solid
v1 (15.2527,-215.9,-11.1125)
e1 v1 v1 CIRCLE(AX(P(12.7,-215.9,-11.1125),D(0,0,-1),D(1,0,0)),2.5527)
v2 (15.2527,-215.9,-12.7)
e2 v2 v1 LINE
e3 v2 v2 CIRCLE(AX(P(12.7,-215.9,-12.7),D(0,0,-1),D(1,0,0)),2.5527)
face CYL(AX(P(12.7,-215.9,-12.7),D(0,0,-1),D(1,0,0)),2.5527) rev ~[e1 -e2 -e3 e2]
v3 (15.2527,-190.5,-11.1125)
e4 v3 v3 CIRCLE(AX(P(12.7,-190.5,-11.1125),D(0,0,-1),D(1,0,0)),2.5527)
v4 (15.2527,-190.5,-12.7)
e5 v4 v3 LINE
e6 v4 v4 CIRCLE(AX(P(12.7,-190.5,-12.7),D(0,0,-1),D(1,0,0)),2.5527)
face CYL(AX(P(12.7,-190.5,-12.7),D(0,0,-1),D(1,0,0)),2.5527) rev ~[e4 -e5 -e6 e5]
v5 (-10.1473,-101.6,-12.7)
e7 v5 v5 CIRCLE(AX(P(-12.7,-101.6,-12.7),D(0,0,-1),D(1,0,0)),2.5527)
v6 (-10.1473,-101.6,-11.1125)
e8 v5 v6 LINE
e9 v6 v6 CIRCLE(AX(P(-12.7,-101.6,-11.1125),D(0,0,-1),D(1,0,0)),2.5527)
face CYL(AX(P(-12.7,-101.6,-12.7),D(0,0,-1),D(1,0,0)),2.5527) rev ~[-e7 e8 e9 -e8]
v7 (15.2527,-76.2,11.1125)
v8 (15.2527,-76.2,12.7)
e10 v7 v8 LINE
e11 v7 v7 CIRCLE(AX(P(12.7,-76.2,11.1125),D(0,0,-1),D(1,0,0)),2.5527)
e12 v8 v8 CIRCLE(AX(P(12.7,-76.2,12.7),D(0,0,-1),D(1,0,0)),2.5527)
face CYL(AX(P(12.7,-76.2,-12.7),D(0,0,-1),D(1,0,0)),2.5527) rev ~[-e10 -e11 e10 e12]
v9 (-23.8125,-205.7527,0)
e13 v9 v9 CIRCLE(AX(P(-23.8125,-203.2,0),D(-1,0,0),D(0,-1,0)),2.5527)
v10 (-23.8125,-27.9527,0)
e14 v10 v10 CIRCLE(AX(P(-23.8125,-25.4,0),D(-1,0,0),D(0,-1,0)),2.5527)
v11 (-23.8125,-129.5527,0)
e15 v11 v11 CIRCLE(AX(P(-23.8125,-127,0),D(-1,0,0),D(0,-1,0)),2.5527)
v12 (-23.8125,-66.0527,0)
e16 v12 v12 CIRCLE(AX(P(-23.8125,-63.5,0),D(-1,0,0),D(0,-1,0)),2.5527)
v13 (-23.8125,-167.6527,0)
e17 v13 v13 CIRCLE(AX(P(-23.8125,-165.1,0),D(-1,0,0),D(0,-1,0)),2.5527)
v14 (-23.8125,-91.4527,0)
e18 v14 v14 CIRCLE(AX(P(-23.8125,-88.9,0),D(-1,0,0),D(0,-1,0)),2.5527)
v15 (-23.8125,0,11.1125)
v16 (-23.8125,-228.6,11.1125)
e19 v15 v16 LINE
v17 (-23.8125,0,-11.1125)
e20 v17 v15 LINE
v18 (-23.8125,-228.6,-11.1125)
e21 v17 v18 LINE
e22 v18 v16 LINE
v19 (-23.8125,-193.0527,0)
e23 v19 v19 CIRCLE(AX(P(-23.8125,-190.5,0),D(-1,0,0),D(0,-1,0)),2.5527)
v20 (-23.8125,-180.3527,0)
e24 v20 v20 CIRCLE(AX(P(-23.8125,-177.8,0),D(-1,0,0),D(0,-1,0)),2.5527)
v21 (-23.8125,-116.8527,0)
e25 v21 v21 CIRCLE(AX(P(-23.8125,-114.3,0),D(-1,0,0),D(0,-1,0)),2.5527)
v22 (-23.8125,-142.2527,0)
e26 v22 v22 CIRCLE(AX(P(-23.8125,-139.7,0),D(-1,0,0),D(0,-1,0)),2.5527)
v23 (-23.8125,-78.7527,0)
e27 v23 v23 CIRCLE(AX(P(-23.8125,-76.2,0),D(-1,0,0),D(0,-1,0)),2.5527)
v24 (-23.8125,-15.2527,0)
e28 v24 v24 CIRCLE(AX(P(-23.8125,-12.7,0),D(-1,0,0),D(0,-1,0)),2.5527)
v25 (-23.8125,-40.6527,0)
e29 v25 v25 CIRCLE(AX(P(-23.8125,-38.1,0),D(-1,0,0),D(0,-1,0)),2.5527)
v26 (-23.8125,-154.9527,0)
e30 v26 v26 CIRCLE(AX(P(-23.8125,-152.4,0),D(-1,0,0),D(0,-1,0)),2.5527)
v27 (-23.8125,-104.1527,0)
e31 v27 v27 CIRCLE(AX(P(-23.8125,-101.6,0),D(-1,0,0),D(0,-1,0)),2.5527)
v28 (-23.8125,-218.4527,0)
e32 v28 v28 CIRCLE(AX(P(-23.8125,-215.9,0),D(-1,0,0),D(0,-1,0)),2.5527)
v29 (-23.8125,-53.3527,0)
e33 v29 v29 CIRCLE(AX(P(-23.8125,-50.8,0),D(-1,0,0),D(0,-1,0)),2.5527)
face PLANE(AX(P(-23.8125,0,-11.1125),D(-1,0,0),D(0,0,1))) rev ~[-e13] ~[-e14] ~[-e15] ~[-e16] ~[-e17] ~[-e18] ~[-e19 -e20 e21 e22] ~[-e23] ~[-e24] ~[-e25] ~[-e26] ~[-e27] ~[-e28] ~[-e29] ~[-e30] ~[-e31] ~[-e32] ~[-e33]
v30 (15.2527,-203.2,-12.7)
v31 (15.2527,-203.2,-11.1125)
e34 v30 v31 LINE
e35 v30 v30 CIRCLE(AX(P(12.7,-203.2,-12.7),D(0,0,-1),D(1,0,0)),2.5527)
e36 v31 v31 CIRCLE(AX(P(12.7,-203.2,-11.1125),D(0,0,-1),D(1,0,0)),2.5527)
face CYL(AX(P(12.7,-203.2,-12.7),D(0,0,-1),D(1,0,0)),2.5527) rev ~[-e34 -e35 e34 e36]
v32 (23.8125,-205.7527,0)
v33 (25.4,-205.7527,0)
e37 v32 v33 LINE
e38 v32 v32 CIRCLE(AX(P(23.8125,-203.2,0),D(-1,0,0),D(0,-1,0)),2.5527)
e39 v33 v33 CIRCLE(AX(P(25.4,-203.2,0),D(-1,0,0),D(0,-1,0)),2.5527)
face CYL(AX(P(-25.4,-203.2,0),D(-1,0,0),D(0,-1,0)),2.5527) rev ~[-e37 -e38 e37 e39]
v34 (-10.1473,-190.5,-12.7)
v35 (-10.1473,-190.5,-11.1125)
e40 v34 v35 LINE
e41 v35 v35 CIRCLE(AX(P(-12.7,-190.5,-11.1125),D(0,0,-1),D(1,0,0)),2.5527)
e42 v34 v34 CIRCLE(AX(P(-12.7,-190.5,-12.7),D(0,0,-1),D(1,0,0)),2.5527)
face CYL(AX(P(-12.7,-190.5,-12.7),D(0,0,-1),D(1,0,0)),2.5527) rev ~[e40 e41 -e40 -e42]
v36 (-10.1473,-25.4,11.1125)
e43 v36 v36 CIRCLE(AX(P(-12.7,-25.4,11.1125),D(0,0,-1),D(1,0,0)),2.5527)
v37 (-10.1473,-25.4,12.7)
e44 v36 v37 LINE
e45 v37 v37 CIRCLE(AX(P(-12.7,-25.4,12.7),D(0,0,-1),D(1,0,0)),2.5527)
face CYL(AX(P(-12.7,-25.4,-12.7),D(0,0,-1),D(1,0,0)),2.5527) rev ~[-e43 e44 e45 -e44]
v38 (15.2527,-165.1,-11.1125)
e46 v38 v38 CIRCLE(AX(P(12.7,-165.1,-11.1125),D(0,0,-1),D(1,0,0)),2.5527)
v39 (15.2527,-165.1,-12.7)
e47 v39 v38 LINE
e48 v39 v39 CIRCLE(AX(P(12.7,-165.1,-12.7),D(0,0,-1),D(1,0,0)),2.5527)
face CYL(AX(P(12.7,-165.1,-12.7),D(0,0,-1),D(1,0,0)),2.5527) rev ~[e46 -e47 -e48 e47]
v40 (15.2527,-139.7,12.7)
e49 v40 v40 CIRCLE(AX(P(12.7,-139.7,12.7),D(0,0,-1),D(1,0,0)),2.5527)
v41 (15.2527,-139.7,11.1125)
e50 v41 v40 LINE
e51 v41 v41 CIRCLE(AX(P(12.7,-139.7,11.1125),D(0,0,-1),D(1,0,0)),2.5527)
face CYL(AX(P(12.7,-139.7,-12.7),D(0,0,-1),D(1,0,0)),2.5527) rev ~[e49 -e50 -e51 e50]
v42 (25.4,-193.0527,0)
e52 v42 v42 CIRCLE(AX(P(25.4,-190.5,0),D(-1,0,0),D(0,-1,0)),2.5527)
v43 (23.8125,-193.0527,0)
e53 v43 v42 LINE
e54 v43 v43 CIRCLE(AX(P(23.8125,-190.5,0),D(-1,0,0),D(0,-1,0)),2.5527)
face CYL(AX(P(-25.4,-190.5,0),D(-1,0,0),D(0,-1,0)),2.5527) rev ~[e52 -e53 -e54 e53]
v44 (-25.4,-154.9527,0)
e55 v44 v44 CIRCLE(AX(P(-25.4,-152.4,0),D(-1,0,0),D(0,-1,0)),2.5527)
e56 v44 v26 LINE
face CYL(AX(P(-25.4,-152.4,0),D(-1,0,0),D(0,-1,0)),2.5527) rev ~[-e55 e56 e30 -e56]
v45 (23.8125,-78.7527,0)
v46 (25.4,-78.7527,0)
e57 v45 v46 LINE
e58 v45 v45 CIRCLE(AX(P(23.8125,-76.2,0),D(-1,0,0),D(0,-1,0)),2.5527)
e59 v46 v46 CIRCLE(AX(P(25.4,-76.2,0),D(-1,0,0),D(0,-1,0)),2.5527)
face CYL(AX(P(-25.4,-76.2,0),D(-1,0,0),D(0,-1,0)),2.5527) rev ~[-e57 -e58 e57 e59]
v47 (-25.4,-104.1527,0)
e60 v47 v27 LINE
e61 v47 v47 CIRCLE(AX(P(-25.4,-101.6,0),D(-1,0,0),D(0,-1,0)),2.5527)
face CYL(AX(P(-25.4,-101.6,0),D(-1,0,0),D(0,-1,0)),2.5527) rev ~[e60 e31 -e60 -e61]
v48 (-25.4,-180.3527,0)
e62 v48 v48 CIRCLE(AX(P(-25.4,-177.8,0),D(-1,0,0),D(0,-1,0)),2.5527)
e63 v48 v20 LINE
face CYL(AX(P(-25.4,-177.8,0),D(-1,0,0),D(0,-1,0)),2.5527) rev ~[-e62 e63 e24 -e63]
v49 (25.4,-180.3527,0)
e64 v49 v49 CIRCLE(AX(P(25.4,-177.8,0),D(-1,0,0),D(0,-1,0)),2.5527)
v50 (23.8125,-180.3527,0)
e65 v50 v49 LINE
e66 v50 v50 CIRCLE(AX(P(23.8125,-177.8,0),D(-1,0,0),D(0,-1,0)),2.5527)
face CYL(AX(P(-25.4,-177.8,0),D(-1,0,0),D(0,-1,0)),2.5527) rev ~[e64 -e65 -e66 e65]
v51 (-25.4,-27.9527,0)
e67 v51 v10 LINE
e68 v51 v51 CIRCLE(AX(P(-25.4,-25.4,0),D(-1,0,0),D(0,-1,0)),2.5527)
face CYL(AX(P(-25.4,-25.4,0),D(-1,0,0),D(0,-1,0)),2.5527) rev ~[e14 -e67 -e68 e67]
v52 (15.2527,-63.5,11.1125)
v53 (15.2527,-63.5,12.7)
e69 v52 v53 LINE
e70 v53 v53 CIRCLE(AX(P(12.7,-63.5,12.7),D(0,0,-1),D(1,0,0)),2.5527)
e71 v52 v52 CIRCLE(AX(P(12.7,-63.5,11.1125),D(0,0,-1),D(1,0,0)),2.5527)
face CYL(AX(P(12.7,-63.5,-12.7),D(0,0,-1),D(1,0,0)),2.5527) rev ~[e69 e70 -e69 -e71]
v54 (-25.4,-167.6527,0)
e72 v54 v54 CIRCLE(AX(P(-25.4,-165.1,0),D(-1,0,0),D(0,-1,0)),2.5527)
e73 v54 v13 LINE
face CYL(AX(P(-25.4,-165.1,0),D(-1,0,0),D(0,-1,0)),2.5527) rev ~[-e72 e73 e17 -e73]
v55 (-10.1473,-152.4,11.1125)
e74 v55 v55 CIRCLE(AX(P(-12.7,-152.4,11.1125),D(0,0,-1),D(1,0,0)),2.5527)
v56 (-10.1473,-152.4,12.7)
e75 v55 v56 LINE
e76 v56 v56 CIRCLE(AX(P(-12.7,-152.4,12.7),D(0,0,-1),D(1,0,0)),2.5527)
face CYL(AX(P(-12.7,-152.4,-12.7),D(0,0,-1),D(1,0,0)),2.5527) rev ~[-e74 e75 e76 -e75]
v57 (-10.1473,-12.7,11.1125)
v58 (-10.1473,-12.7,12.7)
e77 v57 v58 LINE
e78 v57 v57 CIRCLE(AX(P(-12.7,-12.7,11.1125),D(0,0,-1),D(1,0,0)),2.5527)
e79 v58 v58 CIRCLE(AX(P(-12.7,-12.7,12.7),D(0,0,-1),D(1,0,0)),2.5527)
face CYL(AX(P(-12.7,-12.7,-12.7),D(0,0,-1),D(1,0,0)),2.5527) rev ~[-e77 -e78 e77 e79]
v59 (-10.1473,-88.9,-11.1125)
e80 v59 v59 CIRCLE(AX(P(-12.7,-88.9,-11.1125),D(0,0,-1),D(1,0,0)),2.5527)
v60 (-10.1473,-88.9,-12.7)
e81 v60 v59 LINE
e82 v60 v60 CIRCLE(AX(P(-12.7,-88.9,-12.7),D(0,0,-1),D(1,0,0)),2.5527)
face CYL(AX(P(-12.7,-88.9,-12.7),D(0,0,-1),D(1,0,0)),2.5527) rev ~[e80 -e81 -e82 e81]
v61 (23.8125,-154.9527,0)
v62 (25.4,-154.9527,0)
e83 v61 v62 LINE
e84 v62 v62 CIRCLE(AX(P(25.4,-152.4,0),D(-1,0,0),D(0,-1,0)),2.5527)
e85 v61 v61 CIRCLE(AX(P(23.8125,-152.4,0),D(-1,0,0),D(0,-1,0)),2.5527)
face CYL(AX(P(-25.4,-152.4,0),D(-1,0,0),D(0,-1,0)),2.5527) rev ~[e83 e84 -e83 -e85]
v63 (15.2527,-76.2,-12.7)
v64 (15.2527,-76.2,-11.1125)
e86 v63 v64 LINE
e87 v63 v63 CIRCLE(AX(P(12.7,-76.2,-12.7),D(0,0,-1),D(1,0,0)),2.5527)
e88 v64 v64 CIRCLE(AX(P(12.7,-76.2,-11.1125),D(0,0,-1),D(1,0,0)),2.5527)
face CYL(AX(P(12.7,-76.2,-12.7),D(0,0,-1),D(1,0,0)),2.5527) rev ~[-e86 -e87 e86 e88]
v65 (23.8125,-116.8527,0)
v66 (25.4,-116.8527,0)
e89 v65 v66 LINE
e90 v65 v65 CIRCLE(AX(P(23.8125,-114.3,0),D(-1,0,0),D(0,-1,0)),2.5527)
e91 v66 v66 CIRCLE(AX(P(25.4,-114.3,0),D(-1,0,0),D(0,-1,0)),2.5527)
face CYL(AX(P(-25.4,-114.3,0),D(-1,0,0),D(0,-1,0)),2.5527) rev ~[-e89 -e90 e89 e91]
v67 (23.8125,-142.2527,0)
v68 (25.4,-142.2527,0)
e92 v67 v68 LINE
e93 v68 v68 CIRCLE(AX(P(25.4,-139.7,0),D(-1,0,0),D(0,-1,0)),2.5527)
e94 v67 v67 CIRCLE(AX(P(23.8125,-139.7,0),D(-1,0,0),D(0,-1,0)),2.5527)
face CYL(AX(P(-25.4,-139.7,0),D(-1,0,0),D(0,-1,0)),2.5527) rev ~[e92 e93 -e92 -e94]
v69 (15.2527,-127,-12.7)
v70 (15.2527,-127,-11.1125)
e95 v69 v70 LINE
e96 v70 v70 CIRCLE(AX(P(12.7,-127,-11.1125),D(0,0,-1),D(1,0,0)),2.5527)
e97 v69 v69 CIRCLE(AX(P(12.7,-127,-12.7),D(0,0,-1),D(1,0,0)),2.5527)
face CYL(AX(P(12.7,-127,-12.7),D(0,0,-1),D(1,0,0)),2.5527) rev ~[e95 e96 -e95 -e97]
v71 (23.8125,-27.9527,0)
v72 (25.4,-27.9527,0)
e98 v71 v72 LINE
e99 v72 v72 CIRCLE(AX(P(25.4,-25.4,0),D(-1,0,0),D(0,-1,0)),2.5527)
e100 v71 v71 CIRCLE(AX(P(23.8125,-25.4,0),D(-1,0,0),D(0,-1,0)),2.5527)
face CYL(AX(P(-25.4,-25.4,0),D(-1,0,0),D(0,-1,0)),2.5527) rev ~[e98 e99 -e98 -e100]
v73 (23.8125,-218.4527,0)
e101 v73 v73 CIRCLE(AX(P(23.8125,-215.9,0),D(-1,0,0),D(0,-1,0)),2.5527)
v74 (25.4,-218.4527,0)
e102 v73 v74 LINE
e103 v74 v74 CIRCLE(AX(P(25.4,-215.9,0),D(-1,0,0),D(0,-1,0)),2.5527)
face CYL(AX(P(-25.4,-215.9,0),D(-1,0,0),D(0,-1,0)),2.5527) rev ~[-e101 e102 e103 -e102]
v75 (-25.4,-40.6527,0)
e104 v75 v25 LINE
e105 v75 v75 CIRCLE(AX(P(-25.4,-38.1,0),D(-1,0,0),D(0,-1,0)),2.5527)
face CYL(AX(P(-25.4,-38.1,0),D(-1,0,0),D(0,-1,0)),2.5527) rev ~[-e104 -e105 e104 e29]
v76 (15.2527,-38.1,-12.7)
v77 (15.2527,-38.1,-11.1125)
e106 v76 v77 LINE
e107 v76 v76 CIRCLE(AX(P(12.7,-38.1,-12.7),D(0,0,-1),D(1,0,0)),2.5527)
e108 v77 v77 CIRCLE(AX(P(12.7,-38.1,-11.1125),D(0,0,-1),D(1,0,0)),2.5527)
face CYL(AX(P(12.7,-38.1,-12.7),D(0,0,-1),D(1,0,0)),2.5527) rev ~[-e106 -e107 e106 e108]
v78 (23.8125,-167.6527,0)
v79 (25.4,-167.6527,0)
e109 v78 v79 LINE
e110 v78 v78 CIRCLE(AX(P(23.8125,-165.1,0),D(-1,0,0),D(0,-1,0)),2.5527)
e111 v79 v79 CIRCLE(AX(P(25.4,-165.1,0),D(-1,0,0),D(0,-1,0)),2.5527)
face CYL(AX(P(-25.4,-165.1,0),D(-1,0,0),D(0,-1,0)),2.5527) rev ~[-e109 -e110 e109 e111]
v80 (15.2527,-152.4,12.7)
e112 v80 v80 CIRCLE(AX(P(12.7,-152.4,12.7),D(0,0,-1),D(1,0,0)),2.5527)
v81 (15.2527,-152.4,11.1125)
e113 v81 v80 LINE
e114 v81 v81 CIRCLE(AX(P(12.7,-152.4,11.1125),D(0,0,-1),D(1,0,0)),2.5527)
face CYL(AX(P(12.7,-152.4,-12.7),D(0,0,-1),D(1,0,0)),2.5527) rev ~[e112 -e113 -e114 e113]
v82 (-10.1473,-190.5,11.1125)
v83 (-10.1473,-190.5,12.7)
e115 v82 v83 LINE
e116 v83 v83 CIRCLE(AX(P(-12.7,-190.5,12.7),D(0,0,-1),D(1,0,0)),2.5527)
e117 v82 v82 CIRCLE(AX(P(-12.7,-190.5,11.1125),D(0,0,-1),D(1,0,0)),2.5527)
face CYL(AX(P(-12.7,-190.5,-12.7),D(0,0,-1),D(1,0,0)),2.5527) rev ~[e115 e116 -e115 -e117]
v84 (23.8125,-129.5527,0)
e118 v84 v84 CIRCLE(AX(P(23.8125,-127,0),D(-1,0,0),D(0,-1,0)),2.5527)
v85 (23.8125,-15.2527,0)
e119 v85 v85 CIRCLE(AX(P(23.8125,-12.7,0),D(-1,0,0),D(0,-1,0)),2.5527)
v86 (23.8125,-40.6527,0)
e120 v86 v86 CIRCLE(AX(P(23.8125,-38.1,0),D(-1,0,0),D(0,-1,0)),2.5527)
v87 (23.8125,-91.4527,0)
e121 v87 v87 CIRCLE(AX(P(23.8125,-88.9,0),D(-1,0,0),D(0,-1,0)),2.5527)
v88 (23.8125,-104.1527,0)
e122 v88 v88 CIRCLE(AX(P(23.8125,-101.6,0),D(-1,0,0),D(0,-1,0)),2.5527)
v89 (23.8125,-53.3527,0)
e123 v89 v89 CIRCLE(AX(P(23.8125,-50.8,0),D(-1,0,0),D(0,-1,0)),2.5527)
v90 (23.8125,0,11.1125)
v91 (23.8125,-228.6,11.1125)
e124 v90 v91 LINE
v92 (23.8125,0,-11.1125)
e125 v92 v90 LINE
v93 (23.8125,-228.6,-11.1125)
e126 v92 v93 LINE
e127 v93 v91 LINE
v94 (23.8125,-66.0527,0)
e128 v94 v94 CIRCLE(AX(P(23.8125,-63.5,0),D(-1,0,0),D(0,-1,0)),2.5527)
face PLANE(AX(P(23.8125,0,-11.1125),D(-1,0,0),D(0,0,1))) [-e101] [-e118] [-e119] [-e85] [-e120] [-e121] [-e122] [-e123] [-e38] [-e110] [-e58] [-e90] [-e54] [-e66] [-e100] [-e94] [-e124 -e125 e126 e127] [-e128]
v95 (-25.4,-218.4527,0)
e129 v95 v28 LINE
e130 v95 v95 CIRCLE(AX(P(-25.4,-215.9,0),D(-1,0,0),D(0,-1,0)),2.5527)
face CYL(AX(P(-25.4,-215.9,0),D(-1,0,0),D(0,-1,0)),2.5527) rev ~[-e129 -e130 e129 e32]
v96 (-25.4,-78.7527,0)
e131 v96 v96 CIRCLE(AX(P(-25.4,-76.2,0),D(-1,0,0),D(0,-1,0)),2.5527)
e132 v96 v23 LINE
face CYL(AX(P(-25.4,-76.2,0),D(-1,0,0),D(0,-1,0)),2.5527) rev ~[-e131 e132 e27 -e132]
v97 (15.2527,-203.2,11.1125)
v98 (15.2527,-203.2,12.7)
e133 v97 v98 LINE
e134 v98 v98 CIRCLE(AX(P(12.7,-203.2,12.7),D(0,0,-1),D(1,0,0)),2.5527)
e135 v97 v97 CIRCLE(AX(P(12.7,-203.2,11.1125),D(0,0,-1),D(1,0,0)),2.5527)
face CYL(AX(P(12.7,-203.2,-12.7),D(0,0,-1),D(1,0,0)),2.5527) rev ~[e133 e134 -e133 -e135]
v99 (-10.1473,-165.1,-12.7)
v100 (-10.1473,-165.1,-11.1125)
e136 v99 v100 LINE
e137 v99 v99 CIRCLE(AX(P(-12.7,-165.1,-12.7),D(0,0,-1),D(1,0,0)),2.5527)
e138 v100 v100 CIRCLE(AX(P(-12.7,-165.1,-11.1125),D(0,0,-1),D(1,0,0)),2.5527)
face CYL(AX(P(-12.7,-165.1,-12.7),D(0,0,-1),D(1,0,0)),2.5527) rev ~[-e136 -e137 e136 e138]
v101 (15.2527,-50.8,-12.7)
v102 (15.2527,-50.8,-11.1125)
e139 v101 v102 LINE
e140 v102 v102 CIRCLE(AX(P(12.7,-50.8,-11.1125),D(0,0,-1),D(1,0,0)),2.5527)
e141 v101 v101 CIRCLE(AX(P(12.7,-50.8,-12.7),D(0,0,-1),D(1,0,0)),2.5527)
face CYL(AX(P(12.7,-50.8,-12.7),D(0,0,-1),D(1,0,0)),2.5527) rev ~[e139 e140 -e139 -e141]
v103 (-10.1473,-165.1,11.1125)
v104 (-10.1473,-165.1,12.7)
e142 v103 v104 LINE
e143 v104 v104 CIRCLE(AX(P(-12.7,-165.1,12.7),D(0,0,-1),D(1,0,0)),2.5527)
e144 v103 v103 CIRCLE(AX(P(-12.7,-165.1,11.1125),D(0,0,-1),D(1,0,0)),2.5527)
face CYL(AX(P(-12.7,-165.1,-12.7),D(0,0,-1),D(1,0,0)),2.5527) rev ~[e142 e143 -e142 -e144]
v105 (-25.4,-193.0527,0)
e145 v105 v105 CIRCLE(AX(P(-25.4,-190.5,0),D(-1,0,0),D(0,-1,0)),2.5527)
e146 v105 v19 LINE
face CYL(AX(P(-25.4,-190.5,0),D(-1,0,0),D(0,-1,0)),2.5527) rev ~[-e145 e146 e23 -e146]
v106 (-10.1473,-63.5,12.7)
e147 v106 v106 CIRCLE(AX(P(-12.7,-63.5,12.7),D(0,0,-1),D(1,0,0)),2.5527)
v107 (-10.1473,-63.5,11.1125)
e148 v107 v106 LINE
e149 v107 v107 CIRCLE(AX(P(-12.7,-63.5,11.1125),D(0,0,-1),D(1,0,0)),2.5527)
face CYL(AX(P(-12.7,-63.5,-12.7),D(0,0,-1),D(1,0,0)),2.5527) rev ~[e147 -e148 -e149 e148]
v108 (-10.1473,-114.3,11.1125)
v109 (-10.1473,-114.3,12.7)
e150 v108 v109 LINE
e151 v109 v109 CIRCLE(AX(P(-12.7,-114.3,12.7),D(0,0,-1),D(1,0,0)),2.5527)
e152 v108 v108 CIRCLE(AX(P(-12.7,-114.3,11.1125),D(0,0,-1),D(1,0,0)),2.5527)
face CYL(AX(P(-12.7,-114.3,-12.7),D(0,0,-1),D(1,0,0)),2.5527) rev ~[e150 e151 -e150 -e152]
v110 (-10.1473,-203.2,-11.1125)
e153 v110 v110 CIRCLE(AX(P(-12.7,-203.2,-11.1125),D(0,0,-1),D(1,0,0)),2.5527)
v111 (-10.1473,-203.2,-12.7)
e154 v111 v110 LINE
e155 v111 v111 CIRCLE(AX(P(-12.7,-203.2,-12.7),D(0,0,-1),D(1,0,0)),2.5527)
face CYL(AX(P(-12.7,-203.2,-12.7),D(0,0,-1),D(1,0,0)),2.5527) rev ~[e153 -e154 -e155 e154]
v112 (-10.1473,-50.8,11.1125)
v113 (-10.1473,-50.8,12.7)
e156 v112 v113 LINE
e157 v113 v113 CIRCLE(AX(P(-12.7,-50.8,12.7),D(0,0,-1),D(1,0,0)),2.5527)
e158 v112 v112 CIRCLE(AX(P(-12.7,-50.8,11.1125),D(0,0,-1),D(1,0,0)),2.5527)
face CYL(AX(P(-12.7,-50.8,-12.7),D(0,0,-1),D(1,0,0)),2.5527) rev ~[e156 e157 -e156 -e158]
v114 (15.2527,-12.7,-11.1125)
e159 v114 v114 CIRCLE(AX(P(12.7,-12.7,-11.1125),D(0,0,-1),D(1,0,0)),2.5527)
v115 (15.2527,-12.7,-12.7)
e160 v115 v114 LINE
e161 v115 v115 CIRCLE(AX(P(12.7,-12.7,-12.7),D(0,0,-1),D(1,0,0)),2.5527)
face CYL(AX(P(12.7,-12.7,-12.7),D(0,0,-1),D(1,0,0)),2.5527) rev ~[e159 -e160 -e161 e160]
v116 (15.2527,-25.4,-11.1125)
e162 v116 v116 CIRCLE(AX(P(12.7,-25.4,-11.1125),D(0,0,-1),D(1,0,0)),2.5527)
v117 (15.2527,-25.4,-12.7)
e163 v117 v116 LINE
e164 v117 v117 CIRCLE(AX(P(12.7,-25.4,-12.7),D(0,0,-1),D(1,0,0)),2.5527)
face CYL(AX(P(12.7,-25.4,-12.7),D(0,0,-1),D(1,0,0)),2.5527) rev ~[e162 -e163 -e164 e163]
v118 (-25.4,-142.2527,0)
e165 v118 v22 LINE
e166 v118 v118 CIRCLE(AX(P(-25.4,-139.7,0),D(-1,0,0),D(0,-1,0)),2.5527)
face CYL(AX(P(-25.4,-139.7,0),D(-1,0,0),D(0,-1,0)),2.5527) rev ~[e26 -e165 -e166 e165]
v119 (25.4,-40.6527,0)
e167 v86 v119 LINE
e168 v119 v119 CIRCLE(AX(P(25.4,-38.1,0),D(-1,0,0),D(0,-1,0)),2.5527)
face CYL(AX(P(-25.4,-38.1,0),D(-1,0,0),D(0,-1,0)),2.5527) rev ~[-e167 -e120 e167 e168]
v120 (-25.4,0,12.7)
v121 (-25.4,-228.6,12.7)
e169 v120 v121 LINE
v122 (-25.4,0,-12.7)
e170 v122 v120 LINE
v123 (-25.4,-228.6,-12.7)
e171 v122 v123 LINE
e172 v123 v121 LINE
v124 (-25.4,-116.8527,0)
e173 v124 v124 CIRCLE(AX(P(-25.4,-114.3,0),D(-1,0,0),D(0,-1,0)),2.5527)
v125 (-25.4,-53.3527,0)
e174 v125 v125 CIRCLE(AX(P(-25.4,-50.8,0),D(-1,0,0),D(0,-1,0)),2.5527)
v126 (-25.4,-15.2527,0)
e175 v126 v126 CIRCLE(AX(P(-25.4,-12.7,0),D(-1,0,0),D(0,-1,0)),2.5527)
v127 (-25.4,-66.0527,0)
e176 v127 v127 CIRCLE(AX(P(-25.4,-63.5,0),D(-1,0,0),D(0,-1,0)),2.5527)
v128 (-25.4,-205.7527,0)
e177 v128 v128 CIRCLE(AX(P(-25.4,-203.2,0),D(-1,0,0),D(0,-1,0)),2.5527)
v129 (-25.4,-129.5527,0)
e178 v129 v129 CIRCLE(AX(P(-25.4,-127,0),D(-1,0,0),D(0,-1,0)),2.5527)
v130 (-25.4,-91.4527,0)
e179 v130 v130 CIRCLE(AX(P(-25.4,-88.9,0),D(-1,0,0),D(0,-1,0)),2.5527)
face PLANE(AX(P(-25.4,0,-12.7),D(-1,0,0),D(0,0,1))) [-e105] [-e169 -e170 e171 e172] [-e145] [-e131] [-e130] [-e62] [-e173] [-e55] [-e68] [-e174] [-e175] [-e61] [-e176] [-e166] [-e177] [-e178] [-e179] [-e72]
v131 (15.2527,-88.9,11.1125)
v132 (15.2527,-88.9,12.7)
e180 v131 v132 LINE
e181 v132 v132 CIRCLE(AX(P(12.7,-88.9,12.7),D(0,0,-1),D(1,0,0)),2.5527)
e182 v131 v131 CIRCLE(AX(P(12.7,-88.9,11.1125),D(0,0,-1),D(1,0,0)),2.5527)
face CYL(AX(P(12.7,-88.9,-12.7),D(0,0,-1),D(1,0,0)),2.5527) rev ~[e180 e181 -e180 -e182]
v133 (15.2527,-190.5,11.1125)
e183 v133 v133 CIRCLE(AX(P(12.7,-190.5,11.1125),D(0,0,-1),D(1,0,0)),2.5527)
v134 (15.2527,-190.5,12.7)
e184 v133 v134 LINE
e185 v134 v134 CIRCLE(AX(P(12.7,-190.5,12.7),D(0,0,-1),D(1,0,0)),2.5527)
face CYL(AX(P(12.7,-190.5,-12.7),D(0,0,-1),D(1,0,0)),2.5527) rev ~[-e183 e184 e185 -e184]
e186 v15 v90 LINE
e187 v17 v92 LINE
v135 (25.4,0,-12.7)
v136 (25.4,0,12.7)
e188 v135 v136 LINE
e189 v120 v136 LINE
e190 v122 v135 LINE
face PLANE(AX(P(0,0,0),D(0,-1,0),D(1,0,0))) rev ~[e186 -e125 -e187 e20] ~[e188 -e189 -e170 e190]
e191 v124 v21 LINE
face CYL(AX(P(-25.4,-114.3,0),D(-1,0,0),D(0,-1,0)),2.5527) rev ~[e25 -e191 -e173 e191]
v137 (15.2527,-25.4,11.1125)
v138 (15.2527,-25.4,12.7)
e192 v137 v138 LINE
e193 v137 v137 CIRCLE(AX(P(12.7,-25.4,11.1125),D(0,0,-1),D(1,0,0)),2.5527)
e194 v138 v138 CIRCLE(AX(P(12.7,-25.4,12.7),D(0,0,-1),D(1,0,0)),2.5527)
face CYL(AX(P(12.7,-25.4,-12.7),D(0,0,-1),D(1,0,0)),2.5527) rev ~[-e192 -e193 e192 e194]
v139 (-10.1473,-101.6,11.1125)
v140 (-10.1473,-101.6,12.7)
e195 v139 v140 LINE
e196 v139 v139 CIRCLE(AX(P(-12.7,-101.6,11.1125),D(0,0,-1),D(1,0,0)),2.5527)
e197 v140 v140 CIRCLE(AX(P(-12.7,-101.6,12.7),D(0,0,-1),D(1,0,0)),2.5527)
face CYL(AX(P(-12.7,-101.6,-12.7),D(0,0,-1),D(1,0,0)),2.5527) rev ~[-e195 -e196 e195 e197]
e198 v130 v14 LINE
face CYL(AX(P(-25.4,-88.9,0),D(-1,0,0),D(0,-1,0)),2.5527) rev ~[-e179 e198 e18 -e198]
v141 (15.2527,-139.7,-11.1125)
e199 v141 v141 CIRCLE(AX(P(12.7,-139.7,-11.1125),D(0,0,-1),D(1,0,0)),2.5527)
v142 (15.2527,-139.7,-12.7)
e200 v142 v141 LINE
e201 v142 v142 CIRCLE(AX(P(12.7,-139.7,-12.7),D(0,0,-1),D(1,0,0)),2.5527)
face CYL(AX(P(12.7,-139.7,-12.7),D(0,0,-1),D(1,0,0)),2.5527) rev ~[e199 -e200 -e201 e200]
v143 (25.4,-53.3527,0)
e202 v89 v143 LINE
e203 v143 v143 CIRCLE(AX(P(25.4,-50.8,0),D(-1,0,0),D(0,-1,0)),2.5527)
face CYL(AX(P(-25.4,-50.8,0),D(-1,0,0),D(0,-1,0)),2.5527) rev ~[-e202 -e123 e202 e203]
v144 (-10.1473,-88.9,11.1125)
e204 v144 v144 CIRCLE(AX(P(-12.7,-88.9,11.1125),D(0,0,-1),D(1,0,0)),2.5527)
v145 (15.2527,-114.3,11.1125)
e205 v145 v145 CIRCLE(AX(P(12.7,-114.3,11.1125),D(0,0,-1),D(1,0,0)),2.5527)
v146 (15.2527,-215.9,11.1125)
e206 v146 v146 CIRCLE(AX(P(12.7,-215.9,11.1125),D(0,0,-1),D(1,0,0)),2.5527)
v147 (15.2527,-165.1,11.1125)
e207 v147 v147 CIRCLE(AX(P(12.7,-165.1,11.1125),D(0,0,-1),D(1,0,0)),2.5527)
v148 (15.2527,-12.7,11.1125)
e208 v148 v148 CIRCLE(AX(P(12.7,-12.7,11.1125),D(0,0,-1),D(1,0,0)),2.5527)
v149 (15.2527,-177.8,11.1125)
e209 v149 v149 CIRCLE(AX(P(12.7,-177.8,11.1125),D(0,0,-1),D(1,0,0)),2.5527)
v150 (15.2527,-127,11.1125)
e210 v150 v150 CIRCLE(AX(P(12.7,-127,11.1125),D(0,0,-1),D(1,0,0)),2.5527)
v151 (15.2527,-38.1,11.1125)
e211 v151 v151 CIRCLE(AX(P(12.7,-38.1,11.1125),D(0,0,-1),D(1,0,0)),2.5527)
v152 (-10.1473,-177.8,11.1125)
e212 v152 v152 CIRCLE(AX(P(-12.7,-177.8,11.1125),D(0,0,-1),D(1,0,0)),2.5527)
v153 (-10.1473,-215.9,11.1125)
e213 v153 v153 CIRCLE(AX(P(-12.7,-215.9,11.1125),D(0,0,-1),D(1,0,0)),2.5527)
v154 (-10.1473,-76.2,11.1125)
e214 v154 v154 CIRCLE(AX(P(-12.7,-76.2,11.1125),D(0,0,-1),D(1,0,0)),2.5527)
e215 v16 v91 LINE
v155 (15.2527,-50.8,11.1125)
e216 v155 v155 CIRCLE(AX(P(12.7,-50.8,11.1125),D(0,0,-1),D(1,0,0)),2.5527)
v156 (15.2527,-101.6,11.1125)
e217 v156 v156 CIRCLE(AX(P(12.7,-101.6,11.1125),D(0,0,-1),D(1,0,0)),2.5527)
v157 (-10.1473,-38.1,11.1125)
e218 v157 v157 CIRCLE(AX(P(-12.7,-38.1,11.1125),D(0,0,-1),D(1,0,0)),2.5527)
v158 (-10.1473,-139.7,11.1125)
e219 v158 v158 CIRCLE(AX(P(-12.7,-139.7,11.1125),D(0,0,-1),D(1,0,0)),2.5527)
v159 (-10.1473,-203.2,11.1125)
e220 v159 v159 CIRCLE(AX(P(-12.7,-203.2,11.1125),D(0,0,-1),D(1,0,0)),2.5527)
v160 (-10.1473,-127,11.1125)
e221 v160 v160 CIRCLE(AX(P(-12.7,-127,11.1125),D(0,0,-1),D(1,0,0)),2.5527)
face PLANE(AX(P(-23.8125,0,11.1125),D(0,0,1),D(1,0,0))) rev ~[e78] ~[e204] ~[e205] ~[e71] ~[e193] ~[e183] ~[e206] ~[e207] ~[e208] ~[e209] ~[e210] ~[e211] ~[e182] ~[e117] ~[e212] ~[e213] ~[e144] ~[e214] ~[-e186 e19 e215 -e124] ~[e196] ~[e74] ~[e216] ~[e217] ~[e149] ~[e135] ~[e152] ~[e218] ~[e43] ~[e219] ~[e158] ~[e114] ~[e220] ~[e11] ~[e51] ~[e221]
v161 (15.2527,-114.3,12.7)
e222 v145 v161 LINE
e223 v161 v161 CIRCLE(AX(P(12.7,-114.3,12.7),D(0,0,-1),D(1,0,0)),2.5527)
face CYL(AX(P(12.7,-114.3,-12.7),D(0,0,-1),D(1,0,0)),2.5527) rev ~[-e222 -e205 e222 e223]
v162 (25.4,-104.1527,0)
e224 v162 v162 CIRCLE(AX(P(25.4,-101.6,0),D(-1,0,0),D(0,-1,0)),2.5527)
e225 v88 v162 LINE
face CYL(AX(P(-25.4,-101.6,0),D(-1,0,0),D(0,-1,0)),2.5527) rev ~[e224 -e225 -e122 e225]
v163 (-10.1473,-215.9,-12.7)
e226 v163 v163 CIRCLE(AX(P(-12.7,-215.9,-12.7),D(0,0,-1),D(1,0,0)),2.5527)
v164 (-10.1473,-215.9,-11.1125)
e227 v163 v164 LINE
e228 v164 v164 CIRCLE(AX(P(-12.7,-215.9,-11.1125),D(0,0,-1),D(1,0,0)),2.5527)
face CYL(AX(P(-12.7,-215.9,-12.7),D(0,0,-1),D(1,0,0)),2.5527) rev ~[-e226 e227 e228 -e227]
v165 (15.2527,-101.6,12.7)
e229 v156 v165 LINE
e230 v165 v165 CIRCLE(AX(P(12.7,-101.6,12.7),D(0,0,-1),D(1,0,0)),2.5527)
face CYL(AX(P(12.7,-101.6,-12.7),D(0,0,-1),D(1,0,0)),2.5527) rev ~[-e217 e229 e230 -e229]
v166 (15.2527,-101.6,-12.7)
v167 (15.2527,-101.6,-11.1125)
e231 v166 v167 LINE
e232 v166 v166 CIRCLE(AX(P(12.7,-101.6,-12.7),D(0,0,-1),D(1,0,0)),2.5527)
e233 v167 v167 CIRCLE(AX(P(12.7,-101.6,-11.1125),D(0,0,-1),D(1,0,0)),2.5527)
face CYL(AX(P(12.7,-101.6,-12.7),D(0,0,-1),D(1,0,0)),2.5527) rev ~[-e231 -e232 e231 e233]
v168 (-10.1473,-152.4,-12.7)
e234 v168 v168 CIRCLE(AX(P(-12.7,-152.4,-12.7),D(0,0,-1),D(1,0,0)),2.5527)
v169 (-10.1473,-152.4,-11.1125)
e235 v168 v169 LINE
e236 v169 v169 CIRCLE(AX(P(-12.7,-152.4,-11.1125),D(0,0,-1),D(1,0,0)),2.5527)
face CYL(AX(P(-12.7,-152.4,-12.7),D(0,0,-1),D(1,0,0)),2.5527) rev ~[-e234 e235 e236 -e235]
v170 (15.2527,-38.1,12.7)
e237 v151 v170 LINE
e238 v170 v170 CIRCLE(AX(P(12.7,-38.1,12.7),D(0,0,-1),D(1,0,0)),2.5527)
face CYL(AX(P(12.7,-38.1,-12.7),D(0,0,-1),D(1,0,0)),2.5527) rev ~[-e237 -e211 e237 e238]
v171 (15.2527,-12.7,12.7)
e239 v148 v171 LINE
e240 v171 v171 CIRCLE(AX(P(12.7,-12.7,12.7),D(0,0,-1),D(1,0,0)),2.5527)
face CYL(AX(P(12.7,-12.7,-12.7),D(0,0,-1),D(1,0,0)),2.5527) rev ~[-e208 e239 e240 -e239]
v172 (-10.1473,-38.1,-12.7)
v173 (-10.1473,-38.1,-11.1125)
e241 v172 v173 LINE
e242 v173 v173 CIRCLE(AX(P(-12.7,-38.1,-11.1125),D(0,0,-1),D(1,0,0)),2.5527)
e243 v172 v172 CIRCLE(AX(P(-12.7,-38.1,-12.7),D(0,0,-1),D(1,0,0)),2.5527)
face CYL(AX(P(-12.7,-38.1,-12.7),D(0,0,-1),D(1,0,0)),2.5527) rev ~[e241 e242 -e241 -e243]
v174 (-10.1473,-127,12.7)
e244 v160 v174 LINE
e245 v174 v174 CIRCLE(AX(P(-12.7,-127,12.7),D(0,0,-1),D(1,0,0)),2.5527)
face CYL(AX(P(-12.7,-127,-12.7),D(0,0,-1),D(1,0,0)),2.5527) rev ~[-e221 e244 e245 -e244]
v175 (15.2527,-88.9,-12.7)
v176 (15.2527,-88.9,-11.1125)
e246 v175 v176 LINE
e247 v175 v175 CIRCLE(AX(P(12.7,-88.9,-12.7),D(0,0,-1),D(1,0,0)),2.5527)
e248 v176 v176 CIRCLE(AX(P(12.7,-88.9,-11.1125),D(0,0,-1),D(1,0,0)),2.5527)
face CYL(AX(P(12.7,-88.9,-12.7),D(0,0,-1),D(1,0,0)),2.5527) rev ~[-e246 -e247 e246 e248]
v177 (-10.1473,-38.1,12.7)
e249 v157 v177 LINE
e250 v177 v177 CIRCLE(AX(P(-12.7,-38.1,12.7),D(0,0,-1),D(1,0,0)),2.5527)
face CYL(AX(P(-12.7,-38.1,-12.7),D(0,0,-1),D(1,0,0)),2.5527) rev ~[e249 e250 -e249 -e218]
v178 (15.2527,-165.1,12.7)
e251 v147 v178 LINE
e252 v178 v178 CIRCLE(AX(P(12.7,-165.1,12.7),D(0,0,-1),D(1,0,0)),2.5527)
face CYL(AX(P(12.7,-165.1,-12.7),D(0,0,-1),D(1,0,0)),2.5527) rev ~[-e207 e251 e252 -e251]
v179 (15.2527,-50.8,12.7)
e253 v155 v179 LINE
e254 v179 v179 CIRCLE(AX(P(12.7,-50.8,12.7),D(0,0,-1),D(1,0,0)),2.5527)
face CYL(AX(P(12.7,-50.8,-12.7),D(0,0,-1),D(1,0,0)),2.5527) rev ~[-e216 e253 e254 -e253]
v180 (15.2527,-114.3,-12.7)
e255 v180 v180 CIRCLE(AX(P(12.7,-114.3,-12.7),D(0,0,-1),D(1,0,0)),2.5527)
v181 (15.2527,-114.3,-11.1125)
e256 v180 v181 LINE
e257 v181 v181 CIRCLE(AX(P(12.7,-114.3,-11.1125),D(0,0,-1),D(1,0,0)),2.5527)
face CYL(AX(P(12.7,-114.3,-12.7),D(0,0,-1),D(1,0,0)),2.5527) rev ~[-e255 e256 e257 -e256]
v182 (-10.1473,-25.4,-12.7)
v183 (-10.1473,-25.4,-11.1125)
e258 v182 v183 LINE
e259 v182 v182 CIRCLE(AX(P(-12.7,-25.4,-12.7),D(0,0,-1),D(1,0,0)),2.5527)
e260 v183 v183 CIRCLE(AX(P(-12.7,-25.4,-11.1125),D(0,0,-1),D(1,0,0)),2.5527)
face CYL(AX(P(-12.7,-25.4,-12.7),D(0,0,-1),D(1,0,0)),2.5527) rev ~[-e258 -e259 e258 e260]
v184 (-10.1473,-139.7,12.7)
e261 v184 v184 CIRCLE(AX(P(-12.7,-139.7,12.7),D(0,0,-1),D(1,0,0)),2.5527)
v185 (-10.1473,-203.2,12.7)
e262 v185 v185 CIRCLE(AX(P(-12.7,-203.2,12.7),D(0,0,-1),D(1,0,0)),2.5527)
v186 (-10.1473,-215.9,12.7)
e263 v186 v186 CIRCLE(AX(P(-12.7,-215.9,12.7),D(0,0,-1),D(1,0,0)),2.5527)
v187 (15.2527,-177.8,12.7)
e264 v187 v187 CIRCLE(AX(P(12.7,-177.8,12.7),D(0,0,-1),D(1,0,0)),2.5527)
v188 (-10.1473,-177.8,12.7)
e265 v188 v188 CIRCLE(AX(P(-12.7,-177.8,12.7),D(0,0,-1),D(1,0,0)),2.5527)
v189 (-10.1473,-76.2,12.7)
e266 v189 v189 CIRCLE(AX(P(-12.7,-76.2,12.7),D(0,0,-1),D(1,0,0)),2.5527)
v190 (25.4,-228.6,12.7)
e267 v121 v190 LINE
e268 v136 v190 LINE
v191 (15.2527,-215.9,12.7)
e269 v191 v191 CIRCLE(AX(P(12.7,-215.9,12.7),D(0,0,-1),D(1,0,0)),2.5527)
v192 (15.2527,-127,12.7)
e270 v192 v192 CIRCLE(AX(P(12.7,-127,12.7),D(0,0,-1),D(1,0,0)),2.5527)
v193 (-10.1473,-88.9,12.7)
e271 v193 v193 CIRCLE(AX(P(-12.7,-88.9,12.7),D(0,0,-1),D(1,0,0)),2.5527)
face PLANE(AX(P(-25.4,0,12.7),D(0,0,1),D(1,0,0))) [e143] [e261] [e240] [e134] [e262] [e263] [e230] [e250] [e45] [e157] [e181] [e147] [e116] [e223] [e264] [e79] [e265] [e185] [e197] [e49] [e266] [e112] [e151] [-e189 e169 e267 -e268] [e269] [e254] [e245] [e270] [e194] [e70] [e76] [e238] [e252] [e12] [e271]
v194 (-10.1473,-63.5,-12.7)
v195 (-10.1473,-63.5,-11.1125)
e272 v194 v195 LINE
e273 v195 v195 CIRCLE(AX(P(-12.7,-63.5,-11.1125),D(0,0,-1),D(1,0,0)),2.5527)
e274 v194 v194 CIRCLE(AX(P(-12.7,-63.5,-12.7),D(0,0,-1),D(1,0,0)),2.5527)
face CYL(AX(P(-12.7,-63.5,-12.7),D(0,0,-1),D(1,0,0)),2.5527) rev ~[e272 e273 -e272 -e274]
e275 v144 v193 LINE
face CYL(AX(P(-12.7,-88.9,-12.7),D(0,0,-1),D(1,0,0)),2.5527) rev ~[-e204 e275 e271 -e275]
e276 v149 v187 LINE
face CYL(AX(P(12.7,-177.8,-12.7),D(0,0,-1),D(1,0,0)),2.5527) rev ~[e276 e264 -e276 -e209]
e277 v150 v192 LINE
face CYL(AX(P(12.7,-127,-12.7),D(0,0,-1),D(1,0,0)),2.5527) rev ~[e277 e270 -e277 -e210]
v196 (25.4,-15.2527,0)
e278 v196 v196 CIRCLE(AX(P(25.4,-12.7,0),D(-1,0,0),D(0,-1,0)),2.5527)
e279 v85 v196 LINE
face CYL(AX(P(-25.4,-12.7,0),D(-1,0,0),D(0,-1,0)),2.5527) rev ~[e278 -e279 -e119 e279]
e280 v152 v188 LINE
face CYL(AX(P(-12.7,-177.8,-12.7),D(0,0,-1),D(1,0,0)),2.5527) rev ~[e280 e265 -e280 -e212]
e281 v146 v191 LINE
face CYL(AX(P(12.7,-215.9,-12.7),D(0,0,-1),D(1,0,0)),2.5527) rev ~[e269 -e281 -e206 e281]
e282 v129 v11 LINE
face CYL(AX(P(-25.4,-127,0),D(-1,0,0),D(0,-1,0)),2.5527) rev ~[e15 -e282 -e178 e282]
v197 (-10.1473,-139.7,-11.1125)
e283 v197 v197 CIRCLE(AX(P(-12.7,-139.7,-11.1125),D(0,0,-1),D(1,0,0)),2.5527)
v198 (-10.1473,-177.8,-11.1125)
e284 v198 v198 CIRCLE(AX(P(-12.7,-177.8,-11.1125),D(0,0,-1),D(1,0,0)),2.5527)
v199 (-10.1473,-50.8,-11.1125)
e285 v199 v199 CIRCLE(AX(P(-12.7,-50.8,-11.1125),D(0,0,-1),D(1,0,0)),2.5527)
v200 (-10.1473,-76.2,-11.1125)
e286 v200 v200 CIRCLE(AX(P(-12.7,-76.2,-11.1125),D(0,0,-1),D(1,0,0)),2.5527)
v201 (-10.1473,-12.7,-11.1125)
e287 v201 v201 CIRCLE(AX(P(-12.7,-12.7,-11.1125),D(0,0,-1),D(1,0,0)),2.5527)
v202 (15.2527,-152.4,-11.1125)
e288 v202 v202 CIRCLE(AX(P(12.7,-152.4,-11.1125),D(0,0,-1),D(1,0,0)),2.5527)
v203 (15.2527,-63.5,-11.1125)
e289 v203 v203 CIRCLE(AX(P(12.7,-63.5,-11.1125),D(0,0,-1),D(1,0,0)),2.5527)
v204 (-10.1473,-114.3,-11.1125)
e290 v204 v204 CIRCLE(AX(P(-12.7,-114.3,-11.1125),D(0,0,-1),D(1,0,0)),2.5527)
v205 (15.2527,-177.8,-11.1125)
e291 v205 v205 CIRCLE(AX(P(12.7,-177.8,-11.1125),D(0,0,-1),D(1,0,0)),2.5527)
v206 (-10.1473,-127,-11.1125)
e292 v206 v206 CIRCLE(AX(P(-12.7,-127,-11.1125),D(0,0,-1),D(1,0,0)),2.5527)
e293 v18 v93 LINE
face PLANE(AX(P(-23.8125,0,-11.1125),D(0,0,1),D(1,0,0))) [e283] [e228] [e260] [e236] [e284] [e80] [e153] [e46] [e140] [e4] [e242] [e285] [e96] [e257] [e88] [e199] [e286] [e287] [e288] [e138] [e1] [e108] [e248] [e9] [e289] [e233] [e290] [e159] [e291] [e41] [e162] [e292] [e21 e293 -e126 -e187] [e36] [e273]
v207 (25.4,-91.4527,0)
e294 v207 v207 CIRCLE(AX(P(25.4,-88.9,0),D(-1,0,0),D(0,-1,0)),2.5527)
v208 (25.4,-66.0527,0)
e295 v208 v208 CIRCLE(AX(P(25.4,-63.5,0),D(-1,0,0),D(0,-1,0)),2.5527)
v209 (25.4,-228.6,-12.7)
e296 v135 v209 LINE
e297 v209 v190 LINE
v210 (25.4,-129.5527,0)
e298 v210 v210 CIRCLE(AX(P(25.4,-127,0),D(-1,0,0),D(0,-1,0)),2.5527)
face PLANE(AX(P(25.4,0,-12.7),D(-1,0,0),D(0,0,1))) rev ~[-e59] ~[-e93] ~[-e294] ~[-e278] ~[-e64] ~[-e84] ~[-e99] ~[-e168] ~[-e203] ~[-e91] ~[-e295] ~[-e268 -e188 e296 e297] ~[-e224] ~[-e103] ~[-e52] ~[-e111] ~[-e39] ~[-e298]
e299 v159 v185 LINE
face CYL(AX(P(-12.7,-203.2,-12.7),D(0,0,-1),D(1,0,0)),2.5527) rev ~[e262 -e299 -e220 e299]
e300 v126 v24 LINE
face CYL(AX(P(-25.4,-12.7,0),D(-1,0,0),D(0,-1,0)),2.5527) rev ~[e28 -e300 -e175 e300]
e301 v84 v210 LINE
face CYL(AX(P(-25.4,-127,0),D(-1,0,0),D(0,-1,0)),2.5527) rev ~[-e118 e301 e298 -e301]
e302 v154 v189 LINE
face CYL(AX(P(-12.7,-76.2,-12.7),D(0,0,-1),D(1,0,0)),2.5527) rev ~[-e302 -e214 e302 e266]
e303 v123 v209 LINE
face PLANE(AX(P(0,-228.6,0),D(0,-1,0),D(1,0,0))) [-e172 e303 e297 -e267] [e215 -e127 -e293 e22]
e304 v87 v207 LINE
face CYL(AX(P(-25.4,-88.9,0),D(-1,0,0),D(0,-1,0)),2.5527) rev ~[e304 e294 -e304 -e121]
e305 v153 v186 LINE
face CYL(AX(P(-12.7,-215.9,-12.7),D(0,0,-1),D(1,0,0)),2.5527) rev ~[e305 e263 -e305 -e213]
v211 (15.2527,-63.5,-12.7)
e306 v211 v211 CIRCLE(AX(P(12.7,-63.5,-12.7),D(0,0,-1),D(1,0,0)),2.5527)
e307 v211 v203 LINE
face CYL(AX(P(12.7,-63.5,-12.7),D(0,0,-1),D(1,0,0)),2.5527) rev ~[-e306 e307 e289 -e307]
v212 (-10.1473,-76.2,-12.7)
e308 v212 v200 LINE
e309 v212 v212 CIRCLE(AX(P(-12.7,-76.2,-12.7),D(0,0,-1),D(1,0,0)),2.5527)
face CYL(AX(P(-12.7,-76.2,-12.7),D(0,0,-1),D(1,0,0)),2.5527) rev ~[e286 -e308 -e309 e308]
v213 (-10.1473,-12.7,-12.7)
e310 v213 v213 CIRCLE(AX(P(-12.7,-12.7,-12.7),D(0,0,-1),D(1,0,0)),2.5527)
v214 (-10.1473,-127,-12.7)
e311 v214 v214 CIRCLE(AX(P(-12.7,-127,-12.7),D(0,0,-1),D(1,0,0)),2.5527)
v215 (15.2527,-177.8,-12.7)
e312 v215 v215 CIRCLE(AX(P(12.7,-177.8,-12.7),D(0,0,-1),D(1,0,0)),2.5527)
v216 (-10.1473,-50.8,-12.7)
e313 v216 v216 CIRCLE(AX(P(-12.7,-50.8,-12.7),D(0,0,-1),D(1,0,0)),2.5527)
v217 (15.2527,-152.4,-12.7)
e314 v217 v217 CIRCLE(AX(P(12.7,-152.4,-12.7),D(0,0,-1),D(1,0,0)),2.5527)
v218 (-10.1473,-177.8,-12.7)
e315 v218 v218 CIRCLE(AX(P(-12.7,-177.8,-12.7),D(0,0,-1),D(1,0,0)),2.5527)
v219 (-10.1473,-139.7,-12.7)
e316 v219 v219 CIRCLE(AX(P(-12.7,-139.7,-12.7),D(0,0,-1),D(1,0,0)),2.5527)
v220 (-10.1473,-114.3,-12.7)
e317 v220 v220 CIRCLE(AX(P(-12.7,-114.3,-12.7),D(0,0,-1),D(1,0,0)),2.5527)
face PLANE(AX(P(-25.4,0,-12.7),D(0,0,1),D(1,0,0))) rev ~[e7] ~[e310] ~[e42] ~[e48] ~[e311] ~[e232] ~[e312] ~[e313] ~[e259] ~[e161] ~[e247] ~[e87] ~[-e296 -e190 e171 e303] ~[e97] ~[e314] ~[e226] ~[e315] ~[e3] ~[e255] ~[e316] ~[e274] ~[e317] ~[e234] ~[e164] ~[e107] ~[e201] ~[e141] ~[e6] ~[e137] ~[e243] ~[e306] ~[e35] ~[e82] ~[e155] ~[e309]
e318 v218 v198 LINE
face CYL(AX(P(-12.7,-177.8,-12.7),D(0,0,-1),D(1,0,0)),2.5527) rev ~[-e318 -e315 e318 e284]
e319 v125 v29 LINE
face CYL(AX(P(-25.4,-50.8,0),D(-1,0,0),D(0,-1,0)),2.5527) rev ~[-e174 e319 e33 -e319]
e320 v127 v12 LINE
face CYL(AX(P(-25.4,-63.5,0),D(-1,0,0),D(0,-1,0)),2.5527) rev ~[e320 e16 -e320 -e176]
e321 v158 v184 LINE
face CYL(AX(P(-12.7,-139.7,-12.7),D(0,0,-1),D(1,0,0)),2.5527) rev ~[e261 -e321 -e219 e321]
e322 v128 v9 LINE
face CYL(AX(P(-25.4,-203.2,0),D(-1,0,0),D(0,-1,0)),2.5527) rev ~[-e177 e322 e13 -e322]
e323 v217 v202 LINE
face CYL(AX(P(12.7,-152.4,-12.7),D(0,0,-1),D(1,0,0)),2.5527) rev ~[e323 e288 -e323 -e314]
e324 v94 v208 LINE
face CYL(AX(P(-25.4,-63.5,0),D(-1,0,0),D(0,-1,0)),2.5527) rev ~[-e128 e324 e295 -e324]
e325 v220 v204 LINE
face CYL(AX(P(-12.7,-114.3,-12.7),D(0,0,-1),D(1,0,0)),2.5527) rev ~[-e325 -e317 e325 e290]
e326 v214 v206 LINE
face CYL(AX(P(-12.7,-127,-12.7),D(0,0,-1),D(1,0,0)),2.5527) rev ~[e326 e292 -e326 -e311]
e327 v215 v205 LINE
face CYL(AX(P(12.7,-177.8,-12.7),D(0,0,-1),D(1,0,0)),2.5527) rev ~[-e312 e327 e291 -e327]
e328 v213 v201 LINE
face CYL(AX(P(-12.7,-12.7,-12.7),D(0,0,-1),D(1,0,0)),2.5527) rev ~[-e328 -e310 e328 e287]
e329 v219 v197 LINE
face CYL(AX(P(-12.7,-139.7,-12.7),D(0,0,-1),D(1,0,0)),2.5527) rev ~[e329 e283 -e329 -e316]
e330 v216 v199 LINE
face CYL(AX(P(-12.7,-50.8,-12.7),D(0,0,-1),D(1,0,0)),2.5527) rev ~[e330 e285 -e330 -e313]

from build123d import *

# Parameters (mm, degrees)
F0_W     = 50.8
F0_H     = 25.4
F0_W_2   = 47.625
F0_H_2   = 22.225
F1_DEPTH = 228.6
F2_R     = 2.5527
F3_DEPTH = 279.4
F4_R     = 2.5527
F5_DEPTH = 25.4


# Not quite as in the source:
# - a feature names something its author has since deleted; it is built from what else it names


with BuildPart() as f1:
    # F0 (on Front) → F1 (new body)
    with BuildSketch(Plane.XZ):
        Rectangle(F0_W, F0_H)
        Rectangle(F0_W_2, F0_H_2, mode=Mode.SUBTRACT)
    extrude(amount=F1_DEPTH)

    # F2 (on face) → F3 (cut)
    with BuildSketch(Plane(origin=(-25.4, 0, 0), x_dir=(0, -1, 0), z_dir=(-1, 0, 0))):
        with Locations((12.7, 0)):
            Circle(F2_R)
        with Locations((25.4, 0)):
            Circle(F2_R)
        with Locations((38.1, 0)):
            Circle(F2_R)
        with Locations((50.8, 0)):
            Circle(F2_R)
        with Locations((63.5, 0)):
            Circle(F2_R)
        with Locations((88.9, 0)):
            Circle(F2_R)
        with Locations((101.6, 0)):
            Circle(F2_R)
        with Locations((76.2, 0)):
            Circle(F2_R)
        with Locations((114.3, 0)):
            Circle(F2_R)
        with Locations((127, 0)):
            Circle(F2_R)
        with Locations((139.7, 0)):
            Circle(F2_R)
        with Locations((152.4, 0)):
            Circle(F2_R)
        with Locations((165.1, 0)):
            Circle(F2_R)
        with Locations((177.8, 0)):
            Circle(F2_R)
        with Locations((190.5, 0)):
            Circle(F2_R)
        with Locations((203.2, 0)):
            Circle(F2_R)
        with Locations((215.9, 0)):
            Circle(F2_R)
    extrude(amount=-F3_DEPTH, mode=Mode.SUBTRACT)

    # F4 (on face) → F5 (cut)
    with BuildSketch(Plane(origin=(0, 0, -12.7), x_dir=(1, 0, 0), z_dir=(0, 0, -1))):
        with Locations((12.7, 25.4)):
            Circle(F4_R)
        with Locations((-12.7, 25.4)):
            Circle(F4_R)
        with Locations((-12.7, 127)):
            Circle(F4_R)
        with Locations((-12.7, 101.6)):
            Circle(F4_R)
        with Locations((12.7, 152.4)):
            Circle(F4_R)
        with Locations((-12.7, 177.8)):
            Circle(F4_R)
        with Locations((12.7, 63.5)):
            Circle(F4_R)
        with Locations((12.7, 190.5)):
            Circle(F4_R)
        with Locations((12.7, 101.6)):
            Circle(F4_R)
        with Locations((-12.7, 76.2)):
            Circle(F4_R)
        with Locations((-12.7, 139.7)):
            Circle(F4_R)
        with Locations((12.7, 12.7)):
            Circle(F4_R)
        with Locations((12.7, 76.2)):
            Circle(F4_R)
        with Locations((12.7, 50.8)):
            Circle(F4_R)
        with Locations((12.7, 88.9)):
            Circle(F4_R)
        with Locations((12.7, 139.7)):
            Circle(F4_R)
        with Locations((12.7, 177.8)):
            Circle(F4_R)
        with Locations((12.7, 165.1)):
            Circle(F4_R)
        with Locations((-12.7, 190.5)):
            Circle(F4_R)
        with Locations((12.7, 38.1)):
            Circle(F4_R)
        with Locations((-12.7, 38.1)):
            Circle(F4_R)
        with Locations((12.7, 203.2)):
            Circle(F4_R)
        with Locations((-12.7, 63.5)):
            Circle(F4_R)
        with Locations((12.7, 127)):
            Circle(F4_R)
        with Locations((-12.7, 165.1)):
            Circle(F4_R)
        with Locations((-12.7, 88.9)):
            Circle(F4_R)
        with Locations((12.7, 114.3)):
            Circle(F4_R)
        with Locations((-12.7, 114.3)):
            Circle(F4_R)
        with Locations((-12.7, 152.4)):
            Circle(F4_R)
        with Locations((-12.7, 203.2)):
            Circle(F4_R)
        with Locations((-12.7, 12.7)):
            Circle(F4_R)
        with Locations((-12.7, 50.8)):
            Circle(F4_R)
        with Locations((12.7, 215.9)):
            Circle(F4_R)
        with Locations((-12.7, 215.9)):
            Circle(F4_R)
    extrude(amount=-F5_DEPTH, mode=Mode.SUBTRACT)


solid = f1.part
